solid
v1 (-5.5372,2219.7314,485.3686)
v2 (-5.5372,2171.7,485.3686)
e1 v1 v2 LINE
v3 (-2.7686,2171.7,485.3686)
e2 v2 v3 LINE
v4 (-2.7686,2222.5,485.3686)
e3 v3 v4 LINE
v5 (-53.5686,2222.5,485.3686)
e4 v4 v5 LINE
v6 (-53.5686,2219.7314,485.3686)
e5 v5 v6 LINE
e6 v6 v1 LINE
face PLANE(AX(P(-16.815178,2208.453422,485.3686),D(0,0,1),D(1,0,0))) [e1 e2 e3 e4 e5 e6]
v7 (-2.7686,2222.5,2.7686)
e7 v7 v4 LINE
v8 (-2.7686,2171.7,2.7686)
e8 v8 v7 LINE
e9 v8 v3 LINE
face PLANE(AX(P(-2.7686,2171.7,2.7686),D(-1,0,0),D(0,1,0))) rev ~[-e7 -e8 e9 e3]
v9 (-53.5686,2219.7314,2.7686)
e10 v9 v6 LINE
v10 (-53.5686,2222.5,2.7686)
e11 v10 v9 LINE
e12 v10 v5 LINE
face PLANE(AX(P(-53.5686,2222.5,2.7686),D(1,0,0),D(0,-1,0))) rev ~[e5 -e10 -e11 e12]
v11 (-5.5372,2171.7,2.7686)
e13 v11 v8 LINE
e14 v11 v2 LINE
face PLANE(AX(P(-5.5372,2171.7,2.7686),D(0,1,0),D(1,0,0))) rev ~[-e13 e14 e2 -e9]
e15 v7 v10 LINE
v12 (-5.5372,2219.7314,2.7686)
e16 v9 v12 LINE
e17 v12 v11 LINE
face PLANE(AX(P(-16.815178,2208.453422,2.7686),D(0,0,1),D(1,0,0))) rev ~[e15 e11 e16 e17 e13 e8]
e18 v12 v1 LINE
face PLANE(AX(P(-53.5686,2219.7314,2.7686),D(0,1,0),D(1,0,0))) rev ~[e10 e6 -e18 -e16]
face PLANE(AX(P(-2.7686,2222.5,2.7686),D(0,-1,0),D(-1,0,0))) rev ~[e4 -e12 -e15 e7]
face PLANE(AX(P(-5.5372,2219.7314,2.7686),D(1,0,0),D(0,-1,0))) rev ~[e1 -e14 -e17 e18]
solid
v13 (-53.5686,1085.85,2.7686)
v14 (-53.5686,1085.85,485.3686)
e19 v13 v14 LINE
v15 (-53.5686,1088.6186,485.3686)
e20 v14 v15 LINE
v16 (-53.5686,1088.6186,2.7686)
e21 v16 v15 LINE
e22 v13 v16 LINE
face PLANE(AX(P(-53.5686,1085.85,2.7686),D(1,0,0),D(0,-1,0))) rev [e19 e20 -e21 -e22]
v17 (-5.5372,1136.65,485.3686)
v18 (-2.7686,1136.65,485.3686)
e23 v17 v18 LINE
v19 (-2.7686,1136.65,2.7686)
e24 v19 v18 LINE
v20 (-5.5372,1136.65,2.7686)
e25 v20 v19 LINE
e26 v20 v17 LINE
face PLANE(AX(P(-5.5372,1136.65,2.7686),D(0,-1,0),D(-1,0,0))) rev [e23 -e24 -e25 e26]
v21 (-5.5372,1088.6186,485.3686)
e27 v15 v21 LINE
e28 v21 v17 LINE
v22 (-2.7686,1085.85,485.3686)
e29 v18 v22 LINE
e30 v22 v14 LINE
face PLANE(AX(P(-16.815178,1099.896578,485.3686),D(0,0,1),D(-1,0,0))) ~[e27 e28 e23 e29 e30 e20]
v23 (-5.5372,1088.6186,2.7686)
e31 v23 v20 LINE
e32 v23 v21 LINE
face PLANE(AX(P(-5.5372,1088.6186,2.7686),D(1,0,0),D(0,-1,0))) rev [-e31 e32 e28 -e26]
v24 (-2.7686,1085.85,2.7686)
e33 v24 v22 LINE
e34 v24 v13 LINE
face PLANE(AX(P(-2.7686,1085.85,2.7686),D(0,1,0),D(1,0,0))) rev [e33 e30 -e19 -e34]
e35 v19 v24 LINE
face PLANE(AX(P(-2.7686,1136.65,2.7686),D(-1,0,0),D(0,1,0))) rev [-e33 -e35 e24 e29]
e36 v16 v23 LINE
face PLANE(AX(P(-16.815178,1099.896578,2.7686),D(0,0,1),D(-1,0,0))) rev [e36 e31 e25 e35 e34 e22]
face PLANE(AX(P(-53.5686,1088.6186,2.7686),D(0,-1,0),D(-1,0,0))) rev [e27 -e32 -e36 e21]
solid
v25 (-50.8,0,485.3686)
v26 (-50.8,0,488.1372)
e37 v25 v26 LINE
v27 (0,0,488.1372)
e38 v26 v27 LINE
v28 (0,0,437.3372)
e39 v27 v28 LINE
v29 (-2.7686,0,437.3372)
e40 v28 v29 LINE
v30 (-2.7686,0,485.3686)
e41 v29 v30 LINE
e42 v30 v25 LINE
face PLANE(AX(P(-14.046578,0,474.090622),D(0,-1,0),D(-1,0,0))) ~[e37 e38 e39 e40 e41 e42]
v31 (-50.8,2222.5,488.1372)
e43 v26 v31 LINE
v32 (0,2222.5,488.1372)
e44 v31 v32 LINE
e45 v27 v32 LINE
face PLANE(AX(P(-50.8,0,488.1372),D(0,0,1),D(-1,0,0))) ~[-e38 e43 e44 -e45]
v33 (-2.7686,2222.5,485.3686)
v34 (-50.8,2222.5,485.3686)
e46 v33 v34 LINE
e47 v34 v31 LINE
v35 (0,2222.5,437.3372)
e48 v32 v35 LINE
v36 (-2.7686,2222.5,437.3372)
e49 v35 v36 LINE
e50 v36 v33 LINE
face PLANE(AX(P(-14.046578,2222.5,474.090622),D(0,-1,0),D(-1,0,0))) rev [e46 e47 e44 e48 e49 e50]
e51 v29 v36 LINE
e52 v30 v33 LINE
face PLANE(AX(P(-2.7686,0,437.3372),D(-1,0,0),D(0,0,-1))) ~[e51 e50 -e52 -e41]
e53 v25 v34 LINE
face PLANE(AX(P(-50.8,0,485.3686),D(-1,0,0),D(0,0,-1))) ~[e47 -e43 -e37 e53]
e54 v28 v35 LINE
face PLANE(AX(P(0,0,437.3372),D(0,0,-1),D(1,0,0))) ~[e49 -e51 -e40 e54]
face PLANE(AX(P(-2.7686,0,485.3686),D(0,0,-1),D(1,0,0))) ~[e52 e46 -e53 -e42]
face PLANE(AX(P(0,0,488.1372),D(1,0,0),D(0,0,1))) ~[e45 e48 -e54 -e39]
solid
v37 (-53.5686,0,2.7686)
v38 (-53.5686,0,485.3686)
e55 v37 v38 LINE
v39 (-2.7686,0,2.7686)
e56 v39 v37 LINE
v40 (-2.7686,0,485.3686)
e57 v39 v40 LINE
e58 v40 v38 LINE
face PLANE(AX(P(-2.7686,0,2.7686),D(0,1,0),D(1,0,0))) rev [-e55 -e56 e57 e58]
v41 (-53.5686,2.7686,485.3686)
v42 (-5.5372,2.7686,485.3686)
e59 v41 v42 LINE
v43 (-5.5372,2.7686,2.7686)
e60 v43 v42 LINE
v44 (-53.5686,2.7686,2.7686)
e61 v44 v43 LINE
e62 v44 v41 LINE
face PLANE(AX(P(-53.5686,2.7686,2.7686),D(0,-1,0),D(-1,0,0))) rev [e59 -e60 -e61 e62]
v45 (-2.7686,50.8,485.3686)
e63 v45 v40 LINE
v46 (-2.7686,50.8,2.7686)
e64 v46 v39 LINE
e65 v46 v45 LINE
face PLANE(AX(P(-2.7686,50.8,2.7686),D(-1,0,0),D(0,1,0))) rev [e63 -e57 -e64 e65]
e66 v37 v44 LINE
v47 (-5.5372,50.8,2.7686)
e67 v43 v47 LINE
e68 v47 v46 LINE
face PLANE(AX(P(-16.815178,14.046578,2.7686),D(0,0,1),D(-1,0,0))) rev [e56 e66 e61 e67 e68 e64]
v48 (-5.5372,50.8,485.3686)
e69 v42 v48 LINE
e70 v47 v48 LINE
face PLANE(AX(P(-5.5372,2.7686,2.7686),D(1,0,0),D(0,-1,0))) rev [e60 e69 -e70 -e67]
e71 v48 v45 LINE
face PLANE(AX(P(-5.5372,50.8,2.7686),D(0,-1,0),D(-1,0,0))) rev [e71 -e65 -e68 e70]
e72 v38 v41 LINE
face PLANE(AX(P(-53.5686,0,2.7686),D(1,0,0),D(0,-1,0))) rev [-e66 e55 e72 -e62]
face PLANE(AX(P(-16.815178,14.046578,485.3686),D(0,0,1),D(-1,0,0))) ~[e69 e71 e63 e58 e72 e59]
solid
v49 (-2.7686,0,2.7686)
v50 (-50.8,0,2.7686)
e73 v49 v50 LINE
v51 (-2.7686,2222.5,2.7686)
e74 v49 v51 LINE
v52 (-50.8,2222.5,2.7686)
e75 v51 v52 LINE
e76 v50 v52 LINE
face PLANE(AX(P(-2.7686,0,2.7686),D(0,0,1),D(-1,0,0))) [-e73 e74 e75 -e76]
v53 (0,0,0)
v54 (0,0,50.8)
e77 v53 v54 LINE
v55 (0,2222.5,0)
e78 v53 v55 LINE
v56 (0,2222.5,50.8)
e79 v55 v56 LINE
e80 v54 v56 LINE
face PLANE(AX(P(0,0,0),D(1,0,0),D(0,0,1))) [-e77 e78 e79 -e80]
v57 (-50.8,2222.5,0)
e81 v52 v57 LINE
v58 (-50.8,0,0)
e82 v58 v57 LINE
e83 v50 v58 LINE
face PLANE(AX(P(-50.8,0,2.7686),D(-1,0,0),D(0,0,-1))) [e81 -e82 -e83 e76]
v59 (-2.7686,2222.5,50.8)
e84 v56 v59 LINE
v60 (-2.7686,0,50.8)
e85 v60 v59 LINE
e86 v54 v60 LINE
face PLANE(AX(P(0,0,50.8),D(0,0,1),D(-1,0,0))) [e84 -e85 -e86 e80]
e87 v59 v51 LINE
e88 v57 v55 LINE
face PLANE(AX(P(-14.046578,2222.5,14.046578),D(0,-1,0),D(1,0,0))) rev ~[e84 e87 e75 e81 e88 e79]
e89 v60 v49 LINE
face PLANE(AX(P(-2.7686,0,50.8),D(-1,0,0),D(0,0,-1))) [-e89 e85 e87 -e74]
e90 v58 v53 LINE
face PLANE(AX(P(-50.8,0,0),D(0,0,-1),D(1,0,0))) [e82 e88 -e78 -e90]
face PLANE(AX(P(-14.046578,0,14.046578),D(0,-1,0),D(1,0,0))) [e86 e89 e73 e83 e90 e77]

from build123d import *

# Parameters (mm, degrees)
F1_DEPTH = 2222.5
F3_DEPTH = 482.6


# Not quite as in the source:
# - a feature of the source that left no trace in its solid (it failed there, or was rolled back) is left out
# - a pattern or mirror of a feature is missing from the dataset's text; its kind, count and spacing are read off the source's solid


with BuildPart() as f1:
    # F0 (on Front) → F1 (new body)
    with BuildSketch(Plane.XZ):
        Polygon((-50.8, 0), (0, 0), (0, 50.8), (-2.7686, 50.8), (-2.7686, 2.7686), (-50.8, 2.7686), align=None)
    extrude(amount=-F1_DEPTH)


with BuildPart() as f3:
    # F2 (on face) → F3 (new body)
    with BuildSketch(Plane.XY.offset(2.7686)):
        Polygon((-2.7686, 2171.7), (-2.7686, 2222.5), (-53.5686, 2222.5), (-53.5686, 2219.7314), (-5.5372, 2219.7314), (-5.5372, 2171.7), align=None)
    extrude(amount=F3_DEPTH)


with BuildPart() as f3_copies_1:
    # F3_copies: instance of F3
    add(f3.part.mirror(Plane(origin=(0, 1654.175, 0), x_dir=(0, 0, -1), z_dir=(0, -1, 0))))


with BuildPart() as f5_1:
    # F5: instance of F3
    add(f3.part.mirror(Plane.XZ.offset(-1111.25)))


with BuildPart() as f7_1:
    # F7: instance of F1
    add(f1.part.mirror(Plane.XY.offset(244.0686)))


solid = Compound([f1.part, f3.part, f3_copies_1.part, f5_1.part, f7_1.part])
